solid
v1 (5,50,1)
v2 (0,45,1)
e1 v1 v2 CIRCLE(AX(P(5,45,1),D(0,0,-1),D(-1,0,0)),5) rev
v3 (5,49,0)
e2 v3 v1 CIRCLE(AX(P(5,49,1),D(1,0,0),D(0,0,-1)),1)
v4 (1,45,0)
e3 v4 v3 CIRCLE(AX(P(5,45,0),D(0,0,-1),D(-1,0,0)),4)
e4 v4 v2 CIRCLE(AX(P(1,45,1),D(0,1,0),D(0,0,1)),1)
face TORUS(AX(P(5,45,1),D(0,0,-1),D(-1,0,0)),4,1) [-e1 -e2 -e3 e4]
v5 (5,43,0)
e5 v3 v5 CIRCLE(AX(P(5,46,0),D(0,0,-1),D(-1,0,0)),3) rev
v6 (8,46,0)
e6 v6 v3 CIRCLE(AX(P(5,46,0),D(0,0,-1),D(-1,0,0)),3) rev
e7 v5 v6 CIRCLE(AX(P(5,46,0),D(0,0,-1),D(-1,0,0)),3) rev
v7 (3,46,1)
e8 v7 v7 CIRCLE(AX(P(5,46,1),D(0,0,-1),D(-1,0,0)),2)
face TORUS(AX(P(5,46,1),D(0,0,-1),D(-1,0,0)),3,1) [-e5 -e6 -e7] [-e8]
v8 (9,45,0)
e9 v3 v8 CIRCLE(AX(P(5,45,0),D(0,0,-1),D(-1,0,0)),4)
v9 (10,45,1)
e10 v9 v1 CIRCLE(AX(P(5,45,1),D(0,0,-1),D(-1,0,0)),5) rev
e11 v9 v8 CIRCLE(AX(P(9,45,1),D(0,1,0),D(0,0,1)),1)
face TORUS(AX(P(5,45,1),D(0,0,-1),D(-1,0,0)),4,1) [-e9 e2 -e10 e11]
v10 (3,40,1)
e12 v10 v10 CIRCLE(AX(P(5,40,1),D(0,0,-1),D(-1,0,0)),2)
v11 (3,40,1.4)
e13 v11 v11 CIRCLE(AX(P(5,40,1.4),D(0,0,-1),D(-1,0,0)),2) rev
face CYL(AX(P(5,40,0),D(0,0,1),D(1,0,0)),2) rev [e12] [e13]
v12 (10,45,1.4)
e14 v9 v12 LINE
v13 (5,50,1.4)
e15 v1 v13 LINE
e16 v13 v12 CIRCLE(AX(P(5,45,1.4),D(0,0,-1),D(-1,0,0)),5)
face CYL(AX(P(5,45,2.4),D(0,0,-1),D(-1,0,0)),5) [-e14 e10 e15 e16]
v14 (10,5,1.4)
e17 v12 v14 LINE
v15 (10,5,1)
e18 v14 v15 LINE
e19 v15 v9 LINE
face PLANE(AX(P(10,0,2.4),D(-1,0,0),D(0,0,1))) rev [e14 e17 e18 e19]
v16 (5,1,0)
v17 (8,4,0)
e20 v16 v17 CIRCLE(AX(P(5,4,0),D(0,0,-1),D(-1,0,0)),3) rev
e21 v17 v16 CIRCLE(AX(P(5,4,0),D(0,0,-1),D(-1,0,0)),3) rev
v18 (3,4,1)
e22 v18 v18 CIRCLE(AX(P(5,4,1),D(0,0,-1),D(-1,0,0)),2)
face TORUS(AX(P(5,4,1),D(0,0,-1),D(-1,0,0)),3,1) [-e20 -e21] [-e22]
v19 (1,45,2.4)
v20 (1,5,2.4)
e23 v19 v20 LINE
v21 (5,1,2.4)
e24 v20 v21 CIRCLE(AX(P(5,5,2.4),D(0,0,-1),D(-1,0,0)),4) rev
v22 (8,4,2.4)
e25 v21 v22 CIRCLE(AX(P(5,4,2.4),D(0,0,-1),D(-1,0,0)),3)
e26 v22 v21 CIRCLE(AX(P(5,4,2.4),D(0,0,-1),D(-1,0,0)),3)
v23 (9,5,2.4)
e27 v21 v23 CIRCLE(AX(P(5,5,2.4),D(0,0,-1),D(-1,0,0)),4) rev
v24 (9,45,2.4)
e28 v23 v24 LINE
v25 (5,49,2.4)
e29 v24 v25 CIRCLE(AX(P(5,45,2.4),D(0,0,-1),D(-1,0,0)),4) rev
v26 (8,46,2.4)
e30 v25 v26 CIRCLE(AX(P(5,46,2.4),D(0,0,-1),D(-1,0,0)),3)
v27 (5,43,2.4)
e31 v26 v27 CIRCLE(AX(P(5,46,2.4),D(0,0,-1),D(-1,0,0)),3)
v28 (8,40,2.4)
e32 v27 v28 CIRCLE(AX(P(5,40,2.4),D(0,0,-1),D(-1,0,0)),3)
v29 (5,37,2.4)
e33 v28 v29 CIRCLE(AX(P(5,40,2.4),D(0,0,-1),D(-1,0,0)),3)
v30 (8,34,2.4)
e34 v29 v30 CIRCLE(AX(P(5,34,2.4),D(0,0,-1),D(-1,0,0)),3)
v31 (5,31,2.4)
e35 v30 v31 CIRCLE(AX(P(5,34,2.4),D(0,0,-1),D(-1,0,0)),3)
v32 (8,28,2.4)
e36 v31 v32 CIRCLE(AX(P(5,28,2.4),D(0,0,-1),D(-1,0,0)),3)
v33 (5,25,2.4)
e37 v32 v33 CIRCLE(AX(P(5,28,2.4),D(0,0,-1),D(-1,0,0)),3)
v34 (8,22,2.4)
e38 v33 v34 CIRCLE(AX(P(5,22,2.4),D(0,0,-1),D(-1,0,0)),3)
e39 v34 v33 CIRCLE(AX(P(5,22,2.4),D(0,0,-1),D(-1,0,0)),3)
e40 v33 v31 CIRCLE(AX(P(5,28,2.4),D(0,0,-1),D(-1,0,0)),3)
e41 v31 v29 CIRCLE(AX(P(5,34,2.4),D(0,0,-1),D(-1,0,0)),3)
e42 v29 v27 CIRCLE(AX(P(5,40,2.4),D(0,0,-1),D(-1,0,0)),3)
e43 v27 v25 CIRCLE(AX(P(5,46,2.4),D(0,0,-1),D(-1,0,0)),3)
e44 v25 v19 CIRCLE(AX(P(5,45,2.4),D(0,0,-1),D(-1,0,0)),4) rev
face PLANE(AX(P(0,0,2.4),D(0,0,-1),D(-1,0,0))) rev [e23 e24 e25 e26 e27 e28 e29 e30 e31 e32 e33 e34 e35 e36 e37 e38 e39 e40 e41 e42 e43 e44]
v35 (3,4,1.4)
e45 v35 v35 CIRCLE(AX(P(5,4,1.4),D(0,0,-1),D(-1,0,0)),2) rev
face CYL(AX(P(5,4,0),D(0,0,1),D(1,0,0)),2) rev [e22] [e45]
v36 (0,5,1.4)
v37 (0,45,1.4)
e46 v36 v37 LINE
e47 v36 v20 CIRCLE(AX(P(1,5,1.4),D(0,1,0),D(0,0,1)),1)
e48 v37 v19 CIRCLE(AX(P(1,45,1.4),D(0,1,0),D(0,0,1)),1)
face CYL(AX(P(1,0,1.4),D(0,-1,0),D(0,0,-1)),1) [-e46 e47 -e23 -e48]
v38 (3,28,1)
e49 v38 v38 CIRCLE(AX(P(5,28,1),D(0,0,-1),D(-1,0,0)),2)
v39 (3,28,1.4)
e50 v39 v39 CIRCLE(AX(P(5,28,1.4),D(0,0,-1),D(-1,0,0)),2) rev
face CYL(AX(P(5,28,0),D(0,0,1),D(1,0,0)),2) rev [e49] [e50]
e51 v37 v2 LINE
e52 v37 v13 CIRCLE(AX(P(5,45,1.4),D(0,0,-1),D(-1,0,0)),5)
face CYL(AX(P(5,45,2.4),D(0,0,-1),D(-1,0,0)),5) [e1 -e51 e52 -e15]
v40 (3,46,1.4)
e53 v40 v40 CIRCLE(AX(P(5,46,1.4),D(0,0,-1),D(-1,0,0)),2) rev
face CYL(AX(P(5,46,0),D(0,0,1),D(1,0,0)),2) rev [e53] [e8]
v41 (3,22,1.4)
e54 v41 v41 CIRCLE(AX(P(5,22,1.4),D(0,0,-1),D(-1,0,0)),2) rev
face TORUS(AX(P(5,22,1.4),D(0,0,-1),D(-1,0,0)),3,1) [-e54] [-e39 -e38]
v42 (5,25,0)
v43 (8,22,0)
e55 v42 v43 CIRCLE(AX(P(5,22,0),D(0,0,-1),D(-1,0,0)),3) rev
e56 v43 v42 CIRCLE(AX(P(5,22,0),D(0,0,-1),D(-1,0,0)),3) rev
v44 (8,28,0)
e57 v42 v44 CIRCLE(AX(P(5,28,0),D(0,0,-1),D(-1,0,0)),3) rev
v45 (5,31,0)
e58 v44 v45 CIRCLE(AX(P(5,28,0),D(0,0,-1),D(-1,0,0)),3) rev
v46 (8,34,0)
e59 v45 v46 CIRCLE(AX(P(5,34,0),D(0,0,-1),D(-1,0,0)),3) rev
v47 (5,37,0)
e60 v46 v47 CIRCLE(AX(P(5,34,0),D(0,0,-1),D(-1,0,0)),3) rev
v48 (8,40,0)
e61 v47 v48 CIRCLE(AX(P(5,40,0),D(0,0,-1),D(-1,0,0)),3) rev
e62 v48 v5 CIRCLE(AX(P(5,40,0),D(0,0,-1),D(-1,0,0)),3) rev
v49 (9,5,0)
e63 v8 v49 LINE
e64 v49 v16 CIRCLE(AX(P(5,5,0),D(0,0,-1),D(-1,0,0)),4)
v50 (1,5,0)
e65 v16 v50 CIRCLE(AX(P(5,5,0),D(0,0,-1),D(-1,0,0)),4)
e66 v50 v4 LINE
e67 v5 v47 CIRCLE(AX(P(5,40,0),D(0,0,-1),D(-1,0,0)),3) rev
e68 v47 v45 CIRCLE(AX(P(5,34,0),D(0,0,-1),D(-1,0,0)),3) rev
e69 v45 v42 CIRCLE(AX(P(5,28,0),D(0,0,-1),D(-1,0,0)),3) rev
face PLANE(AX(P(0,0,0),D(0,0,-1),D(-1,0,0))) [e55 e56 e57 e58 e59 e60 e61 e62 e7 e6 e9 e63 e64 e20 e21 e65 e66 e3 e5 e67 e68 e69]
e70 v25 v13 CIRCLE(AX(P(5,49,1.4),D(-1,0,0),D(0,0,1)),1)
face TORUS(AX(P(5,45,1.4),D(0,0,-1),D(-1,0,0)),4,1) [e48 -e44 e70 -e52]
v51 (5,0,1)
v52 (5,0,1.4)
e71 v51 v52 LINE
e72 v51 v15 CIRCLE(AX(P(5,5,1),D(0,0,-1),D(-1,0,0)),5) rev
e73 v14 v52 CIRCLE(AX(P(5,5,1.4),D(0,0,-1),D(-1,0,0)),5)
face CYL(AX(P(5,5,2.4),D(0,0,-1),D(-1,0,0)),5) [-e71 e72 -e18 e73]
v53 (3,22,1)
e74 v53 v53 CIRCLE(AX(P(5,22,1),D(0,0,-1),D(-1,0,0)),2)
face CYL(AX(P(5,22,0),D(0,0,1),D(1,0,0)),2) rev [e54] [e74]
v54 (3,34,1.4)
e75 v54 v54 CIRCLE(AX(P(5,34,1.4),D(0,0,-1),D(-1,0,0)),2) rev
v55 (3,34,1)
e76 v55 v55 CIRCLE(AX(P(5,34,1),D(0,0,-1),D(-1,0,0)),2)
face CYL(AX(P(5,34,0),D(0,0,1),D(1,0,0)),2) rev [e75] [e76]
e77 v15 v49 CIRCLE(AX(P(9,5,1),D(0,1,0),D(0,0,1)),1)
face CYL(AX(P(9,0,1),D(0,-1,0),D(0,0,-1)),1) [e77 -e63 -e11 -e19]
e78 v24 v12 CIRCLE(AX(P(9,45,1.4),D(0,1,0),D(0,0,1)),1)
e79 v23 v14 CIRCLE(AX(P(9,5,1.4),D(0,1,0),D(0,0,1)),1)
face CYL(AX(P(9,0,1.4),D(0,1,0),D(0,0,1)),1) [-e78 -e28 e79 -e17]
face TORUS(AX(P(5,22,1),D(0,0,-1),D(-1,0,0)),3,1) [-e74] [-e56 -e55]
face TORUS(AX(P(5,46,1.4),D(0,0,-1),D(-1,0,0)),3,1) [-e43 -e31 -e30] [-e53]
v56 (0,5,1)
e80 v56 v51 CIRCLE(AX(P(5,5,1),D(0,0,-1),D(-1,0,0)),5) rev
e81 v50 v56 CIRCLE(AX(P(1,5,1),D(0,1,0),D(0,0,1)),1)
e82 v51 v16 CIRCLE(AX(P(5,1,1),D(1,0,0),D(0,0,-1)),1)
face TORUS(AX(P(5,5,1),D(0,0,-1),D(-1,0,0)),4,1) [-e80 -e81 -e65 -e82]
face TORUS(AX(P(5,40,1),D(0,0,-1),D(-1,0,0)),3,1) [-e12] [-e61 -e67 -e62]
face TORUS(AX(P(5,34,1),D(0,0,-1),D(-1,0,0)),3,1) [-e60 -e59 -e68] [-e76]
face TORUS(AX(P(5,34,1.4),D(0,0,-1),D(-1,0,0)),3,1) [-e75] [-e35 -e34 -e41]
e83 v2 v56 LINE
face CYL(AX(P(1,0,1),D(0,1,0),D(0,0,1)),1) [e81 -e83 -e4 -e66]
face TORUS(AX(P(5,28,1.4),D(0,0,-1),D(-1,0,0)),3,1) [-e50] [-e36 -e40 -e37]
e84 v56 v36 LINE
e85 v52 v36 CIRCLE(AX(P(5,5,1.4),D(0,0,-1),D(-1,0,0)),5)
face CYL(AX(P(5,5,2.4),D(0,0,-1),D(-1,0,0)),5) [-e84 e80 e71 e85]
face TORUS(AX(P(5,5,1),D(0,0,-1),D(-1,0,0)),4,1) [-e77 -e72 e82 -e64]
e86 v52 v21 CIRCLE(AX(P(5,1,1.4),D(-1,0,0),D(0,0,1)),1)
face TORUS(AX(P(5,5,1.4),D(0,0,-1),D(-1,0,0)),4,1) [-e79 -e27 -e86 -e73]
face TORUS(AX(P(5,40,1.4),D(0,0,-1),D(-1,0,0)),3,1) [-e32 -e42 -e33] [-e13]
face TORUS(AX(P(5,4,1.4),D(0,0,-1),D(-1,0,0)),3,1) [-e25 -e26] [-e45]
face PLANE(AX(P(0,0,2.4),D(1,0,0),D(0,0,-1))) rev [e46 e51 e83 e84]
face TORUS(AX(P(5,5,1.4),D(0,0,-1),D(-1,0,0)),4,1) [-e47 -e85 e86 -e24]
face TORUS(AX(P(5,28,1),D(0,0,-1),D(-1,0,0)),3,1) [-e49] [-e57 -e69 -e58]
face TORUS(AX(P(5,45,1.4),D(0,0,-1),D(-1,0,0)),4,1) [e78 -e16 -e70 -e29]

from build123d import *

# Parameters (mm, degrees)
SKETCH1_W           = 10
SKETCH1_H           = 50
BOSS_EXTRUDE1_DEPTH = 2.4
SKETCH2_R           = 2
CUT_EXTRUDE1_DEPTH  = 52.046645335
FILLET2_R           = 5
FILLET1_R           = 1


with BuildPart() as part:
    # Sketch1 → Boss-Extrude1 (new body)
    with BuildSketch(Plane.XY):
        with Locations((5, 25)):
            Rectangle(SKETCH1_W, SKETCH1_H)
    extrude(amount=BOSS_EXTRUDE1_DEPTH)

    # Sketch2 → Cut-Extrude1 (cut, through all)
    with BuildSketch(Plane.XY.offset(2.4)):
        with Locations((5, 46)):
            Circle(SKETCH2_R)
        with Locations((5, 4)):
            Circle(SKETCH2_R)
        with Locations((5, 40)):
            Circle(SKETCH2_R)
        with Locations((5, 34)):
            Circle(SKETCH2_R)
        with Locations((5, 28)):
            Circle(SKETCH2_R)
        with Locations((5, 22)):
            Circle(SKETCH2_R)
    extrude(amount=-CUT_EXTRUDE1_DEPTH, mode=Mode.SUBTRACT)

    # Fillet2
    fillet2_edges = [part.edges().sort_by_distance(p)[0] for p in [
        (0, 0, 1.2),
        (10, 0, 1.2),
        (10, 50, 1.2),
        (0, 50, 1.2),
    ]]
    fillet(fillet2_edges, radius=FILLET2_R - 0.0001)  # a hair under: the kernel refuses the full size

    # Fillet1
    fillet1_edges = [part.edges().sort_by_distance(p)[0] for p in [
        (3, 46, 0),
        (3, 46, 2.4),
        (3, 22, 0),
        (3, 22, 2.4),
        (3, 34, 0),
        (3, 34, 2.4),
        (3, 40, 0),
        (3, 40, 2.4),
        (3, 28, 0),
        (3, 28, 2.4),
        (3, 4, 0),
        (3, 4, 2.4),
        (0, 25, 0),
        (10, 25, 0),
        (1.464436805, 48.535563195, 0),
        (8.535563195, 48.535563195, 0),
        (8.535563195, 1.464436805, 0),
        (1.464436805, 1.464436805, 0),
        (0, 25, 2.4),
        (10, 25, 2.4),
        (1.464436805, 48.535563195, 2.4),
        (8.535563195, 48.535563195, 2.4),
        (8.535563195, 1.464436805, 2.4),
        (1.464436805, 1.464436805, 2.4),
    ]]
    fillet(fillet1_edges, radius=FILLET1_R - 0.0001)  # a hair under: the kernel refuses the full size


solid = part.part
